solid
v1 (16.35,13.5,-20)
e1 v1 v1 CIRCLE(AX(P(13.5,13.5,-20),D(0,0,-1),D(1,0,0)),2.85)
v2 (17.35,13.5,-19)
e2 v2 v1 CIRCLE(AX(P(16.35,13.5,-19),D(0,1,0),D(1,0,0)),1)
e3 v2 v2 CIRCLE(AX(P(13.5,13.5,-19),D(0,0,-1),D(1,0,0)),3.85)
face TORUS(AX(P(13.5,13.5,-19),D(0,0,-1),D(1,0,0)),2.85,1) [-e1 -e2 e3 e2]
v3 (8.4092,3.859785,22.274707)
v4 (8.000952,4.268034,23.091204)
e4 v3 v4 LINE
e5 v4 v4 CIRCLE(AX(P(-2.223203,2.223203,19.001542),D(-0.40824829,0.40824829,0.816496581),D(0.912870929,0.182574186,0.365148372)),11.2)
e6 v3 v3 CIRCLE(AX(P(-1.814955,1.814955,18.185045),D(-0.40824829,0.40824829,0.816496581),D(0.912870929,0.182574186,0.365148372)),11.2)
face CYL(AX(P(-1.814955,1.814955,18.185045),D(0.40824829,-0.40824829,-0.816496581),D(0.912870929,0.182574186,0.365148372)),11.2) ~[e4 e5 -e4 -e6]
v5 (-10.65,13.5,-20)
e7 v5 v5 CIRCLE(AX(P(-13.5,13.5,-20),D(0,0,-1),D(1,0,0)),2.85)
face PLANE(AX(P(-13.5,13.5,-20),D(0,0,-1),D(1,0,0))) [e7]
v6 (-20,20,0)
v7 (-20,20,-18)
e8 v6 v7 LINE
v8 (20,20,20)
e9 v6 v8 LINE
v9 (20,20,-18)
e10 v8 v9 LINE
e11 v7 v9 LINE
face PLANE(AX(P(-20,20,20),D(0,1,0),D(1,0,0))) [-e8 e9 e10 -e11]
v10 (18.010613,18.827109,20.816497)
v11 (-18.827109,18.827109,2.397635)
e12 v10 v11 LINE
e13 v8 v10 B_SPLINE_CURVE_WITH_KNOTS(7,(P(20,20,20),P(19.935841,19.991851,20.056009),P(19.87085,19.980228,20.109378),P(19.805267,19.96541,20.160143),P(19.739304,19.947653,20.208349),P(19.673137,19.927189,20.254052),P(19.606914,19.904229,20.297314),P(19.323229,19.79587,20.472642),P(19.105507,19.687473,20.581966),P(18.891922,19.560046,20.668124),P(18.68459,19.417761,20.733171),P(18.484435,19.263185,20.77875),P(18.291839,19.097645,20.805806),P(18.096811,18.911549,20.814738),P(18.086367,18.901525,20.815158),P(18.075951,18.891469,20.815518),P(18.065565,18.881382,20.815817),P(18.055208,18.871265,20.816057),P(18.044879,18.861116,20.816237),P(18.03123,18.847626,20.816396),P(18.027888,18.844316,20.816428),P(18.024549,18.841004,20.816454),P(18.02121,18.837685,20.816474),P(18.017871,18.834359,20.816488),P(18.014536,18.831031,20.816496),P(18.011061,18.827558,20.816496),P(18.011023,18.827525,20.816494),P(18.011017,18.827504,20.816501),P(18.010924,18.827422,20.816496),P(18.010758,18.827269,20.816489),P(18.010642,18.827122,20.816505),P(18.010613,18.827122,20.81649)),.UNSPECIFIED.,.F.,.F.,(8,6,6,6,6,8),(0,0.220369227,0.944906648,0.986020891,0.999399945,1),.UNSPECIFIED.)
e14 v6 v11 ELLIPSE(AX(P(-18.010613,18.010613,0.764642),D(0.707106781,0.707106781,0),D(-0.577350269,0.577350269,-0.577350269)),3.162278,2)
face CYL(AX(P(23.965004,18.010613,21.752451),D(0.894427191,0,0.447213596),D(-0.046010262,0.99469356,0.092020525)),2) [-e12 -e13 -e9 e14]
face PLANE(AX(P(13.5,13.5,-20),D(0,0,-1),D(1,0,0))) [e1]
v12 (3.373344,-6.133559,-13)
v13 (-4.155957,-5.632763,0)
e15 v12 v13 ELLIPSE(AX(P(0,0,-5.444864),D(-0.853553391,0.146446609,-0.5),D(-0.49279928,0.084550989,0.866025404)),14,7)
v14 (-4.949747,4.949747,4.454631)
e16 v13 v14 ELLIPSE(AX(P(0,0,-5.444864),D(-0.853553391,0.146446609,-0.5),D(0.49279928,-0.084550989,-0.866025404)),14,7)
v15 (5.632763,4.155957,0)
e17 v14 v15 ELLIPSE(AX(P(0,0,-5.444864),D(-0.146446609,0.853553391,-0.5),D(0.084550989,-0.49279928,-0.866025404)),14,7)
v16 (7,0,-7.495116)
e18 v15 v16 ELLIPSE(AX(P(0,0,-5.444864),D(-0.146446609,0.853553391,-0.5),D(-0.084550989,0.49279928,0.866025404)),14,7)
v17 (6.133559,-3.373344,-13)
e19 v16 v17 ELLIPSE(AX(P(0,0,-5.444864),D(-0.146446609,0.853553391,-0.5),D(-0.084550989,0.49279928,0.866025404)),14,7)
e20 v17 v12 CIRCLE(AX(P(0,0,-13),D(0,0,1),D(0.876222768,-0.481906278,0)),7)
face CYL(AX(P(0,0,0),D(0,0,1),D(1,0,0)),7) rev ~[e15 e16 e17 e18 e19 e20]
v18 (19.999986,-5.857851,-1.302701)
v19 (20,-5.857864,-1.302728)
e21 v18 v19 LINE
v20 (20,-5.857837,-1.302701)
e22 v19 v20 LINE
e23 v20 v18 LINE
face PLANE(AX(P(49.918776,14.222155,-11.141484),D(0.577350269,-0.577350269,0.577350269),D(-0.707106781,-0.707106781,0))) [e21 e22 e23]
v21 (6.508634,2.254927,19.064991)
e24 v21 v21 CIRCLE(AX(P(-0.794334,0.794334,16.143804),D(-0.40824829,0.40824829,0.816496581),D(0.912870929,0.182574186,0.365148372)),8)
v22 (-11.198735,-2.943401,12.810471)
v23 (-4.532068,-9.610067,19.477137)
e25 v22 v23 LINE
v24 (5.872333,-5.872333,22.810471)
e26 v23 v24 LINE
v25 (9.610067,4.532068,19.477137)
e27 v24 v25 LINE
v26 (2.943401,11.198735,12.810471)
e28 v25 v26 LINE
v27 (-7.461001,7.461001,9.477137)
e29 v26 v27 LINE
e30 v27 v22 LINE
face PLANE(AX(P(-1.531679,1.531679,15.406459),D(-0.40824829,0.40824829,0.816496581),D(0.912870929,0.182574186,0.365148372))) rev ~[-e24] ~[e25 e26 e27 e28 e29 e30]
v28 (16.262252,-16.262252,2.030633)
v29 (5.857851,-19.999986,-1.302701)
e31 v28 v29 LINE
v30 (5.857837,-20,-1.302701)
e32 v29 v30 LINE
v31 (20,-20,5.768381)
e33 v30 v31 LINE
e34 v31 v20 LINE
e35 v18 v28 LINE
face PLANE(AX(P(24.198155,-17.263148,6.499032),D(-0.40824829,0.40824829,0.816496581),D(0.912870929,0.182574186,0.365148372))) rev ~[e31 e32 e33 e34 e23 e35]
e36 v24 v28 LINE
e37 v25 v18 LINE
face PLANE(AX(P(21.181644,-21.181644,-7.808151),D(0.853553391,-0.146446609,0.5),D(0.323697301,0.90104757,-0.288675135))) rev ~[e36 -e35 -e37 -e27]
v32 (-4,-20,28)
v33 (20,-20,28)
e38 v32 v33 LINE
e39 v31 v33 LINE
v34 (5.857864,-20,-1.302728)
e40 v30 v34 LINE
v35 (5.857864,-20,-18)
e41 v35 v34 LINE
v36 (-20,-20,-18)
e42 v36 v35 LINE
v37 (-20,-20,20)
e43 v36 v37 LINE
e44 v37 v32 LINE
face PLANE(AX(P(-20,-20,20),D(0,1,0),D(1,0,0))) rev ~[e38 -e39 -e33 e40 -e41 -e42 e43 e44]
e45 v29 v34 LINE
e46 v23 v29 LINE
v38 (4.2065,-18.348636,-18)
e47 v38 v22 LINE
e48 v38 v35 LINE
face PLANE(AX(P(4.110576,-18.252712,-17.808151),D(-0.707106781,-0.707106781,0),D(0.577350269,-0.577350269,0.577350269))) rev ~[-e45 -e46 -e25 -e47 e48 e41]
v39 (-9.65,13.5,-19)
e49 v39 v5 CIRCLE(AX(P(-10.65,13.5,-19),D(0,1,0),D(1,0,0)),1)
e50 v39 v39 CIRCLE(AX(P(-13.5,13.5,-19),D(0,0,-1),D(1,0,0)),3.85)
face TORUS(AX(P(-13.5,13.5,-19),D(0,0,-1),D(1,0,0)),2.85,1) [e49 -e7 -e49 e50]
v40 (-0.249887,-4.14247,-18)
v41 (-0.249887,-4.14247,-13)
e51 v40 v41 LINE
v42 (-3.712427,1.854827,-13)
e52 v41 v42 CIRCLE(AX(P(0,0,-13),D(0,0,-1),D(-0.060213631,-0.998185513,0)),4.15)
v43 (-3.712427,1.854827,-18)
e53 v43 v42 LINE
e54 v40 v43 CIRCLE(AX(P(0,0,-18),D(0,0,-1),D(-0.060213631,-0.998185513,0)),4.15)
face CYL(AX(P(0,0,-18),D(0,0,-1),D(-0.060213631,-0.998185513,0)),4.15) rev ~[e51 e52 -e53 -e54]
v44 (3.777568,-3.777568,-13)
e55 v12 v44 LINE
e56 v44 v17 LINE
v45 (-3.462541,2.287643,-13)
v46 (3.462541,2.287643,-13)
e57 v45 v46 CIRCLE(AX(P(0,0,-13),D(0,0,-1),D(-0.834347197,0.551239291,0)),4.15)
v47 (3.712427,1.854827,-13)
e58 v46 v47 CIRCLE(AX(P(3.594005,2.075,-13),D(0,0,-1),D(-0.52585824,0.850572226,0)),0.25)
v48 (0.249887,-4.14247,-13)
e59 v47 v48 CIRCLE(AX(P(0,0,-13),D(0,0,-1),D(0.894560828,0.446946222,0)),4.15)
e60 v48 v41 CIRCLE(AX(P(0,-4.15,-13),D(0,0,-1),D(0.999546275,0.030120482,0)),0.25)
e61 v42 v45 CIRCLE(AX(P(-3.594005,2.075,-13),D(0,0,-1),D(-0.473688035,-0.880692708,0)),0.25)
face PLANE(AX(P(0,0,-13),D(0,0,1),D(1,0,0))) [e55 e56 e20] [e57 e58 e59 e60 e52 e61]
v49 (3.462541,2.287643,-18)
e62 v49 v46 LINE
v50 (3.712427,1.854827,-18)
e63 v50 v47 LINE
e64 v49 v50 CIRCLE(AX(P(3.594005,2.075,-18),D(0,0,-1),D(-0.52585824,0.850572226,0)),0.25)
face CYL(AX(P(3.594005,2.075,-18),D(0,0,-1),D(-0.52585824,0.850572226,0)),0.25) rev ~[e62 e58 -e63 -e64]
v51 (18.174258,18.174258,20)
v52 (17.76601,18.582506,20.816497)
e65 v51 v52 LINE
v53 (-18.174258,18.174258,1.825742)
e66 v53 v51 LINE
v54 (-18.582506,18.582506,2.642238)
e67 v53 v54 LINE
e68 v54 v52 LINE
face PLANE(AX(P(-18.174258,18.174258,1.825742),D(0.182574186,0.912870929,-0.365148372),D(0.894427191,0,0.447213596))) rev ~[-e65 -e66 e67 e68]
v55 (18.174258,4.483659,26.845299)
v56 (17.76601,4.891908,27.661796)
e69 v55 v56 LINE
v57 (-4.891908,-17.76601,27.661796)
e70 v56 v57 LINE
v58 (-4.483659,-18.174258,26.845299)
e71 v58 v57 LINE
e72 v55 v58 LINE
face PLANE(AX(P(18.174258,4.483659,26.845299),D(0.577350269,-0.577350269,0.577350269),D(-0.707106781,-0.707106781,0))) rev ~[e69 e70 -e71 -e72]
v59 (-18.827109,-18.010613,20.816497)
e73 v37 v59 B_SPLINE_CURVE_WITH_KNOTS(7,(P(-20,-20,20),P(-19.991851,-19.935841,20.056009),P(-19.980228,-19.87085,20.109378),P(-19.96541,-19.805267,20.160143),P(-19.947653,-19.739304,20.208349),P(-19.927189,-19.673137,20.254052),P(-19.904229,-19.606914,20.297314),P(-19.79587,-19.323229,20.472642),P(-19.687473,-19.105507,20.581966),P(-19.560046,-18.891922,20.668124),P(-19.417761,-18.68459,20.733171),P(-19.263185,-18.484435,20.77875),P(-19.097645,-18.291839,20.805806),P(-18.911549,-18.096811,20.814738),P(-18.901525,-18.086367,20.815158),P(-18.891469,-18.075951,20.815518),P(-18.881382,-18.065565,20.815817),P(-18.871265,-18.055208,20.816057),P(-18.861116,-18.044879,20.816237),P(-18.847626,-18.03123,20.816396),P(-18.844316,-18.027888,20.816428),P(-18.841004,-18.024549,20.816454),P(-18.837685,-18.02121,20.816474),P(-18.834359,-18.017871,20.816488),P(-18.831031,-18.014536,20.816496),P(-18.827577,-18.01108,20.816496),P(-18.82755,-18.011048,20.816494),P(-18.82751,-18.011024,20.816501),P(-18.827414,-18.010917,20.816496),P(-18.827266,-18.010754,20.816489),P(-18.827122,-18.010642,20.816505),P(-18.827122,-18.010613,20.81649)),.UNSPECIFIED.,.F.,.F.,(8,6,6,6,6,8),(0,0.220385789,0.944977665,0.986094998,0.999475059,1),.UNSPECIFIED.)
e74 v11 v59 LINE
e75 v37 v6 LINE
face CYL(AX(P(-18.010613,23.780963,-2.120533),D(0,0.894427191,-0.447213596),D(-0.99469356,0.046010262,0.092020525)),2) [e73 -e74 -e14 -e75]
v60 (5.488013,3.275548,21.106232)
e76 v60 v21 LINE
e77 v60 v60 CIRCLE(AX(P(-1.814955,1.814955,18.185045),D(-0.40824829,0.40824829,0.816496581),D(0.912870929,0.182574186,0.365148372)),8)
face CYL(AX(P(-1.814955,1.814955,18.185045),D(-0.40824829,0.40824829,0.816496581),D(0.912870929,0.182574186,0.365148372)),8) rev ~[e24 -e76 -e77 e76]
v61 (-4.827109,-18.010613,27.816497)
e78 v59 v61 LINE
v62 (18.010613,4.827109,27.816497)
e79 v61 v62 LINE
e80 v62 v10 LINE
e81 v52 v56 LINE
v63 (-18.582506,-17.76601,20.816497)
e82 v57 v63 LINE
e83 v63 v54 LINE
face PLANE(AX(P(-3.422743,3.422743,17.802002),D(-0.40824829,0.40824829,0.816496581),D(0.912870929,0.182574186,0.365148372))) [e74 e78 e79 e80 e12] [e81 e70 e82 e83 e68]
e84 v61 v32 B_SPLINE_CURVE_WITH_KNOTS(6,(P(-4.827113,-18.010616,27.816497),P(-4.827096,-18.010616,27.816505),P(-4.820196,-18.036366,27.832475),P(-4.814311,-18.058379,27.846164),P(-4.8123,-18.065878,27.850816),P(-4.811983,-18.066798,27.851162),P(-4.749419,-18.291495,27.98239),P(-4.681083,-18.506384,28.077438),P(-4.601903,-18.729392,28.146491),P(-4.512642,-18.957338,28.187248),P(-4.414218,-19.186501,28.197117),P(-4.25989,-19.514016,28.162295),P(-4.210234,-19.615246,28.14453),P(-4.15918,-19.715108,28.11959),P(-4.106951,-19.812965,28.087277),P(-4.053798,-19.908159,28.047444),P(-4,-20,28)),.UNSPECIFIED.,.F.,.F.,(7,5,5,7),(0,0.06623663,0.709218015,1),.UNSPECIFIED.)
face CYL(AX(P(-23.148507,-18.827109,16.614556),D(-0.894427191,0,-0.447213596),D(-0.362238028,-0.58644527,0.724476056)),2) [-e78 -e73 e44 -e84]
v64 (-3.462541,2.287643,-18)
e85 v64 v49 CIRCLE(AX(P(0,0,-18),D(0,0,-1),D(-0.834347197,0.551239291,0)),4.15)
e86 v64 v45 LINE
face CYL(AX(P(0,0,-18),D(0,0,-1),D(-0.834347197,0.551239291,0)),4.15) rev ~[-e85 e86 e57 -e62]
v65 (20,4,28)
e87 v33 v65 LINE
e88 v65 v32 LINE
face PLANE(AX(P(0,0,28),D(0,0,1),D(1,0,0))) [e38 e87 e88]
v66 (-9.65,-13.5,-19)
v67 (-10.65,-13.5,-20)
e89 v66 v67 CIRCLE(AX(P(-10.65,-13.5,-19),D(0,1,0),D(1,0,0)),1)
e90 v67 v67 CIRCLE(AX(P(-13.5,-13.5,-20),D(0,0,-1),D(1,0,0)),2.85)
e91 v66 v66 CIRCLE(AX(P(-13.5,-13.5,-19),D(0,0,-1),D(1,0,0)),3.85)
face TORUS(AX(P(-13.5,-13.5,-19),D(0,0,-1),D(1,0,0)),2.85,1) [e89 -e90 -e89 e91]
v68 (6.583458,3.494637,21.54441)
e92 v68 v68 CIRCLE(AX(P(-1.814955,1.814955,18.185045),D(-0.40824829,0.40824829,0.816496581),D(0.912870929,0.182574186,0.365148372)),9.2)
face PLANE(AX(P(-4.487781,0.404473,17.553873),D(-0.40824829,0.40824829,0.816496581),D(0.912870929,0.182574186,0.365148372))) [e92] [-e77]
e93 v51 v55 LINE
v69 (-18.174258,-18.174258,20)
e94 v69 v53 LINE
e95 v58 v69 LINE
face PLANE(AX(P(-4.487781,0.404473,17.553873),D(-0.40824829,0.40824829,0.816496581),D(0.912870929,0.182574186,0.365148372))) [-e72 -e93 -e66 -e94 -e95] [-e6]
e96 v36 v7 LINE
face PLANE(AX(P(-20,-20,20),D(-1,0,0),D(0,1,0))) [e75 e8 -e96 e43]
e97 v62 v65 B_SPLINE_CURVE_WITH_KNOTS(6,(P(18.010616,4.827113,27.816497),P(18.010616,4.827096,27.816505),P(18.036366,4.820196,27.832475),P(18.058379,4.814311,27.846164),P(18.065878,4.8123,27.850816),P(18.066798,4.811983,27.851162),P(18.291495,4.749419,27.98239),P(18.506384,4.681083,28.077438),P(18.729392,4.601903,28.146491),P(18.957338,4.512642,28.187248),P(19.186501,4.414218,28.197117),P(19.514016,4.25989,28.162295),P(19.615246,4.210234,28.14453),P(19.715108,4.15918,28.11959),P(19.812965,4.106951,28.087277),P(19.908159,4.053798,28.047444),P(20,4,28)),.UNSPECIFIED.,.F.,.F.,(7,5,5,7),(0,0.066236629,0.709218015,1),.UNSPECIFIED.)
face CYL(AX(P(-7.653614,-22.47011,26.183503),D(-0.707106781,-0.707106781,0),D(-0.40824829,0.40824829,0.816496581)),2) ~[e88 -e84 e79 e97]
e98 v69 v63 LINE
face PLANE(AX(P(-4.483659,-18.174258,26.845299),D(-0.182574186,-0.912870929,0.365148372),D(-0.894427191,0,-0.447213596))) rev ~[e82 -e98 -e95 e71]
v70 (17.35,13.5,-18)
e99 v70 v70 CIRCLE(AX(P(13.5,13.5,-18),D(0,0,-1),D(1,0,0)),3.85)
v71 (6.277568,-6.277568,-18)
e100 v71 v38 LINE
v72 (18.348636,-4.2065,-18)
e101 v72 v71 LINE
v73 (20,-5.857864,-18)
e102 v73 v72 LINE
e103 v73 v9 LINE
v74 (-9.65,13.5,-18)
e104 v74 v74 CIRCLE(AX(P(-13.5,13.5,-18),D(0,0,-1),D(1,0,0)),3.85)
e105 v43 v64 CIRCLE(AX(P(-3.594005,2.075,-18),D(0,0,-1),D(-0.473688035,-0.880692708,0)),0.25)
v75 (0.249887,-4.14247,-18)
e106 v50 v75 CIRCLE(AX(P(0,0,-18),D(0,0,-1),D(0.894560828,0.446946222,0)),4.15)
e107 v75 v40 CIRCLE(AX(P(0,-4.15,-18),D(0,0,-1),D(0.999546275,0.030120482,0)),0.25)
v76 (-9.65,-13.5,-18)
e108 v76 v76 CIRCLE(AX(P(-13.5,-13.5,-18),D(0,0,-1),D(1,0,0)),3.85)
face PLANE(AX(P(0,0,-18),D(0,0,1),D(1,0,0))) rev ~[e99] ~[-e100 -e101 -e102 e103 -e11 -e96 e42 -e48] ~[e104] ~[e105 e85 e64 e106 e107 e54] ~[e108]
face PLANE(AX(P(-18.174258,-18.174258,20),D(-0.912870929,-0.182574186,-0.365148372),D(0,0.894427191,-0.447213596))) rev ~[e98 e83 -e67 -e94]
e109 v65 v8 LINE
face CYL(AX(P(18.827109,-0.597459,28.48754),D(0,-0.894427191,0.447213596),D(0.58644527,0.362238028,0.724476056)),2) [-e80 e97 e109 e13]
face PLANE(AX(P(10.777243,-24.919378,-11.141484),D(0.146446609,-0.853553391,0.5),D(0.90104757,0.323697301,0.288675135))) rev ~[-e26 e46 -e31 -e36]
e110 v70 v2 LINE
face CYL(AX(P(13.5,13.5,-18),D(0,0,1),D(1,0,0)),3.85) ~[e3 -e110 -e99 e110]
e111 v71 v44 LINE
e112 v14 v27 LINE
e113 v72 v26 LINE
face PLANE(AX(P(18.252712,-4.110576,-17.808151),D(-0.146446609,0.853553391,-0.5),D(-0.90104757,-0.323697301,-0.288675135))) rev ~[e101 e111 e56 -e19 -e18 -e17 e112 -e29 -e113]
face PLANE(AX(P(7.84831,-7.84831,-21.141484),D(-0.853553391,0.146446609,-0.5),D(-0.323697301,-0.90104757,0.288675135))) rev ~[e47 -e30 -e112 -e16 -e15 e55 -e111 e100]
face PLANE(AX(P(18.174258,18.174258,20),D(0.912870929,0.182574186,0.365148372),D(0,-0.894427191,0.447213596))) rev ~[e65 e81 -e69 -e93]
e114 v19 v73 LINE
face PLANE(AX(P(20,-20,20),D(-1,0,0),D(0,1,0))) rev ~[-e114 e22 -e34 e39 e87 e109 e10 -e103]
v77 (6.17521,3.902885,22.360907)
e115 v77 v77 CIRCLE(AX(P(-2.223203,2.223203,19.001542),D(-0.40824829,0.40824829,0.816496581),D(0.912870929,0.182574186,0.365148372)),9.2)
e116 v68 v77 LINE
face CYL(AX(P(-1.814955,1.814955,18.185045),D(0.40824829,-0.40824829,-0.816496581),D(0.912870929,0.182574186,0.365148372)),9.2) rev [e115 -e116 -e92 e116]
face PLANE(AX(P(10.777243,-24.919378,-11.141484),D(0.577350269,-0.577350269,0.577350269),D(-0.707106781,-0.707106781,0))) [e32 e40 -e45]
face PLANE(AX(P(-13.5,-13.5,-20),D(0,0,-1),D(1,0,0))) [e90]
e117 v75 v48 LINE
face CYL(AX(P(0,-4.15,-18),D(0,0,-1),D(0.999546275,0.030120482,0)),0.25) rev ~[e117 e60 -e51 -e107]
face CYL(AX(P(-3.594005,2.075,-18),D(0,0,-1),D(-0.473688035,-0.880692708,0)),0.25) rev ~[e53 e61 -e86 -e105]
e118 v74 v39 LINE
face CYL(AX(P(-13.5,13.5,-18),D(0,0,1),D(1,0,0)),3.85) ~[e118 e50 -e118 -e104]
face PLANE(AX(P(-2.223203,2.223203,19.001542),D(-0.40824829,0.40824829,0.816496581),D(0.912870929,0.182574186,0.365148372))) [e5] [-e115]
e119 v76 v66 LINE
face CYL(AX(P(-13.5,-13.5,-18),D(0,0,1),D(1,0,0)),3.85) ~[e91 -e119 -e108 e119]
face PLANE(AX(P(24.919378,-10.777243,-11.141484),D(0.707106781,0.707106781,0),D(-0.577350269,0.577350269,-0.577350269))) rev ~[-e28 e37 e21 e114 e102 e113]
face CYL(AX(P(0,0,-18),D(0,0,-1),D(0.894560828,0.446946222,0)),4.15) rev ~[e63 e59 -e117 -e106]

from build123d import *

# Parameters (mm, degrees)
F0_W         = 40
F0_H         = 40
F1_DEPTH     = 20
F3_DEPTH     = 18
F4_DEPTH     = 8
F5_R         = 48.402363322
F6_DEPTH     = 25
F7_R         = 8
F8_DEPTH     = 47.3578016938
F11_DEPTH    = 37.5
F12_DEPTH    = 12.05
F13_R        = 3.85
F14_DEPTH    = 2
F15_DEPTH    = 25
F16_R        = 7
F17_DEPTH    = 13
F18_DEPTH    = 18.5
F19_R        = 1
F20_R        = 11.2
F20_R_2      = 9.2
F21_DEPTH    = 1
F22_T1_DEPTH = 26.5487978578
F22_T3_DEPTH = 53.3816135878
F22_T5_DEPTH = 53.3816135878
F22_T7_DEPTH = 26.5487978578
F22_T9_DEPTH = 42.6013795348


# Not quite as in the source:
# - a fillet or chamfer that OpenCascade refuses, or shapes differently, is made with other operations: its cross-section is extruded or revolved along the edge and cut away or added


with BuildPart() as f1:
    # F0 (on Top) → F1 (new body)
    with BuildSketch(Plane.XY):
        Rectangle(F0_W, F0_H)
    extrude(amount=F1_DEPTH)

    # F3 (add): a face of the model
    f3_faces = [f1.faces().sort_by_distance(p)[0] for p in [
        (0, 0, 0),
    ]]
    extrude(f3_faces, amount=F3_DEPTH)

    # F4 (add): a face of the model
    f4_faces = [f1.faces().sort_by_distance(p)[0] for p in [
        (0, 0, 20),
    ]]
    extrude(f4_faces, amount=F4_DEPTH)

    # F5 (on 3pt) → F6 (cut)
    with BuildSketch(Plane(origin=(-6.6666666667, 6.6666666667, 13.3333333333), x_dir=(0.9128709292, 0.1825741858, 0.3651483717), z_dir=(-0.4082482905, 0.4082482905, 0.8164965809))):
        with Locations((2.3868493736, -7.4885585345)):
            Circle(F5_R)
    extrude(amount=F6_DEPTH, mode=Mode.SUBTRACT)

    # F7 (on face) → F8 (cut, through all)
    with BuildSketch(Plane(origin=(-6.6666666667, 6.6666666667, 13.3333333333), x_dir=(0.9128709292, 0.1825741858, 0.3651483717), z_dir=(-0.4082482905, 0.4082482905, 0.8164965809))):
        with Locations((5.3147843089, -6.5092548249)):
            Circle(F7_R)
    extrude(amount=-F8_DEPTH, mode=Mode.SUBTRACT)

    # F10 (on offset) → F11 (cut, symmetric)
    with BuildSketch(Plane(origin=(9.6632649519, -9.6632649519, -19.3265299038), x_dir=(0.9128709292, 0.1825741858, 0.3651483717), z_dir=(-0.4082482905, 0.4082482905, 0.8164965809))):
        Polygon((16.712234718, -4.6568354596), (9.4092672846, 4.2874364504), (-1.9881831245, 2.4350170851), (-6.0826661002, -8.3616741902), (1.2203013332, -17.3059461002), align=None)
        Polygon((12.6177517423, -15.4535267349), (16.712234718, -4.6568354596), (1.2203013332, -17.3059461002), align=None)
    extrude(amount=F11_DEPTH, both=True, mode=Mode.SUBTRACT)

    # F10 (on offset) → F12 (cut)
    with BuildSketch(Plane(origin=(9.6632649519, -9.6632649519, -19.3265299038), x_dir=(0.9128709292, 0.1825741858, 0.3651483717), z_dir=(-0.4082482905, 0.4082482905, 0.8164965809))):
        Polygon((44.0977028976, 17.7033056762), (16.712234718, -4.6568354596), (12.6177517423, -15.4535267349), (1.2203013332, -17.3059461002), (-18.4589771374, -33.3740096866), (-1.5124044388, -54.1292376868), (61.0442755962, -3.051922324), align=None)
    extrude(amount=F12_DEPTH, mode=Mode.SUBTRACT)

    # F13 (on face) → F14 (join)
    with BuildSketch(Plane(origin=(0, 0, -18), x_dir=(1, 0, 0), z_dir=(0, 0, -1))):
        with Locations((-13.5, 13.5)):
            Circle(F13_R)
        with Locations((-13.5, -13.5)):
            Circle(F13_R)
        with Locations((13.5, -13.5)):
            Circle(F13_R)
    extrude(amount=F14_DEPTH)

    # F13 (on face) → F15 (cut)
    with BuildSketch(Plane(origin=(0, 0, -18), x_dir=(1, 0, 0), z_dir=(0, 0, -1))):
        with BuildLine():
            ThreePointArc((0.2498865688, 4.1424698795), (0, 4.4), (-0.2498865688, 4.1424698795))
            ThreePointArc((-0.2498865688, 4.1424698795), (-3.5940054257, 2.075), (-3.7124274345, -1.8548268231))
            ThreePointArc((-3.7124274345, -1.8548268231), (-3.8105117767, -2.2), (-3.4625408657, -2.2876430564))
            ThreePointArc((-3.4625408657, -2.2876430564), (0, -4.15), (3.4625408657, -2.2876430564))
            ThreePointArc((3.4625408657, -2.2876430564), (3.8105117767, -2.2), (3.7124274345, -1.8548268231))
            ThreePointArc((3.7124274345, -1.8548268231), (3.5940054257, 2.075), (0.2498865688, 4.1424698795))
        make_face()
    extrude(amount=-F15_DEPTH, mode=Mode.SUBTRACT)

    # F16 (on Top) → F17 (cut)
    with BuildSketch(Plane.XY):
        Circle(F16_R)
    extrude(amount=-F17_DEPTH, mode=Mode.SUBTRACT)

    # F16 (on Top) → F18 (cut)
    with BuildSketch(Plane.XY):
        Circle(F16_R)
    extrude(amount=F18_DEPTH, mode=Mode.SUBTRACT)

    # F19
    f19_edges = [f1.edges().sort_by_distance(p)[0] for p in [
        (-17.35, 13.5, -20),
        (-17.35, -13.5, -20),
        (9.65, 13.5, -20),
    ]]
    fillet(f19_edges, radius=F19_R)

    # F20 (on face) → F21 (join)
    with BuildSketch(Plane(origin=(-6.6666666667, 6.6666666667, 13.3333333333), x_dir=(0.9128709292, 0.1825741858, 0.3651483717), z_dir=(-0.4082482905, 0.4082482905, 0.8164965809))):
        Polygon((2.9211869734, -30.410524494), (29.2118697336, -8.94427191), (29.2118697336, 8.94427191), (-14.6059348668, 17.88854382), (-14.6059348668, -26.83281573), align=None)
        Polygon((27.2118697336, -7.9952761744), (2.3913648452, -28.2611335526), (-12.6059348668, -25.1998225681), (-12.6059348668, 15.4390540772), (27.2118697336, 7.3112787481), align=None, mode=Mode.SUBTRACT)
        with Locations((5.3147843089, -6.5092548249)):
            Circle(F20_R)
        with Locations((5.3147843089, -6.5092548249)):
            Circle(F20_R_2, mode=Mode.SUBTRACT)
    extrude(amount=F21_DEPTH)

    # F22: fillet of radius 2 on 5 edges, made by hand

    # F22_s2 → F22_t1 (cut)
    with BuildSketch(Plane(origin=(-11.8729833462, 0, -5.9364916731), x_dir=(0, 1, 0), z_dir=(0.894427191, 0, 0.4472135955))):
        with BuildLine():
            ThreePointArc((-20, 26.83281573), (-19.0328736084, 27.2022251402), (-18.0106128795, 27.038579878))
            Line((-18.0106128795, 27.038579878), (-17.9942829478, 27.0750947152))
            Line((-17.9942829478, 27.0750947152), (-19.5754217779, 27.7822014963))
            Line((-19.5754217779, 27.7822014963), (-19.6282665467, 27.7620165908))
            ThreePointArc((-19.6282665467, 27.7620165908), (-19.8323906919, 27.3055811262), (-20.0234578108, 26.8652152842))
            Line((-20.0234578108, 26.8652152842), (-20, 26.83281573))
        make_face()
    extrude(amount=F22_T1_DEPTH, mode=Mode.SUBTRACT)

    # F22_s4 → F22_t3 (cut)
    with BuildSketch(Plane(origin=(0, 19.8729833462, -9.9364916731), x_dir=(1, 0, 0), z_dir=(0, -0.894427191, 0.4472135955))):
        with BuildLine():
            ThreePointArc((-20, 8.94427191), (-19.6305905898, 9.9113983016), (-18.8271094604, 10.5642496204))
            Line((-18.8271094604, 10.5642496204), (-18.843439392, 10.6007644575))
            Line((-18.843439392, 10.6007644575), (-20.4245782221, 9.8936576763))
            Line((-20.4245782221, 9.8936576763), (-20.4447631276, 9.8408129076))
            ThreePointArc((-20.4447631276, 9.8408129076), (-20.2406389824, 9.384377443), (-20.0397877424, 8.948387193))
            Line((-20.0397877424, 8.948387193), (-20, 8.94427191))
        make_face()
    extrude(amount=F22_T3_DEPTH, mode=Mode.SUBTRACT)

    # F22_s6 → F22_t5 (cut)
    with BuildSketch(Plane(origin=(27.8729833462, 0, 13.9364916731), x_dir=(0, 1, 0), z_dir=(-0.894427191, 0, -0.4472135955))):
        with BuildLine():
            ThreePointArc((20, -8.94427191), (19.6305905898, -9.9113983016), (18.8271094604, -10.5642496204))
            Line((18.8271094604, -10.5642496204), (18.843439392, -10.6007644575))
            Line((18.843439392, -10.6007644575), (20.4245782221, -9.8936576763))
            Line((20.4245782221, -9.8936576763), (20.4447631276, -9.8408129076))
            ThreePointArc((20.4447631276, -9.8408129076), (20.2406389824, -9.384377443), (20.0397877424, -8.948387193))
            Line((20.0397877424, -8.948387193), (20, -8.94427191))
        make_face()
    extrude(amount=F22_T5_DEPTH, mode=Mode.SUBTRACT)

    # F22_s8 → F22_t7 (cut)
    with BuildSketch(Plane(origin=(0, -11.8729833462, 5.9364916731), x_dir=(1, 0, 0), z_dir=(0, 0.894427191, -0.4472135955))):
        with BuildLine():
            ThreePointArc((20, -26.83281573), (19.0328736084, -27.2022251402), (18.0106128795, -27.038579878))
            Line((18.0106128795, -27.038579878), (17.9942829478, -27.0750947152))
            Line((17.9942829478, -27.0750947152), (19.5754217779, -27.7822014963))
            Line((19.5754217779, -27.7822014963), (19.6282665467, -27.7620165908))
            ThreePointArc((19.6282665467, -27.7620165908), (19.8323906919, -27.3055811262), (20.0234578108, -26.8652152842))
            Line((20.0234578108, -26.8652152842), (20, -26.83281573))
        make_face()
    extrude(amount=F22_T7_DEPTH, mode=Mode.SUBTRACT)

    # F22_s10 → F22_t9 (cut)
    with BuildSketch(Plane(origin=(-15.0618621785, -15.0618621785, 0), x_dir=(0, 0, 1), z_dir=(0.7071067812, 0.7071067812, 0))):
        with BuildLine():
            ThreePointArc((27.8164965809, 9.3221446674), (28.1750672506, 10.2933417867), (28, 11.313708499))
            Line((28, 11.313708499), (28.0363299316, 11.3304457648))
            ThreePointArc((28.0363299316, 11.3304457648), (28.4313423012, 11.0576932276), (28.8395905917, 10.769018093))
            Line((28.8395905917, 10.769018093), (28.8491564442, 10.713264219))
            Line((28.8491564442, 10.713264219), (27.8491564442, 9.2990506567))
            Line((27.8491564442, 9.2990506567), (27.8164965809, 9.3221446674))
        make_face()
    extrude(amount=F22_T9_DEPTH, mode=Mode.SUBTRACT)


solid = f1.part
